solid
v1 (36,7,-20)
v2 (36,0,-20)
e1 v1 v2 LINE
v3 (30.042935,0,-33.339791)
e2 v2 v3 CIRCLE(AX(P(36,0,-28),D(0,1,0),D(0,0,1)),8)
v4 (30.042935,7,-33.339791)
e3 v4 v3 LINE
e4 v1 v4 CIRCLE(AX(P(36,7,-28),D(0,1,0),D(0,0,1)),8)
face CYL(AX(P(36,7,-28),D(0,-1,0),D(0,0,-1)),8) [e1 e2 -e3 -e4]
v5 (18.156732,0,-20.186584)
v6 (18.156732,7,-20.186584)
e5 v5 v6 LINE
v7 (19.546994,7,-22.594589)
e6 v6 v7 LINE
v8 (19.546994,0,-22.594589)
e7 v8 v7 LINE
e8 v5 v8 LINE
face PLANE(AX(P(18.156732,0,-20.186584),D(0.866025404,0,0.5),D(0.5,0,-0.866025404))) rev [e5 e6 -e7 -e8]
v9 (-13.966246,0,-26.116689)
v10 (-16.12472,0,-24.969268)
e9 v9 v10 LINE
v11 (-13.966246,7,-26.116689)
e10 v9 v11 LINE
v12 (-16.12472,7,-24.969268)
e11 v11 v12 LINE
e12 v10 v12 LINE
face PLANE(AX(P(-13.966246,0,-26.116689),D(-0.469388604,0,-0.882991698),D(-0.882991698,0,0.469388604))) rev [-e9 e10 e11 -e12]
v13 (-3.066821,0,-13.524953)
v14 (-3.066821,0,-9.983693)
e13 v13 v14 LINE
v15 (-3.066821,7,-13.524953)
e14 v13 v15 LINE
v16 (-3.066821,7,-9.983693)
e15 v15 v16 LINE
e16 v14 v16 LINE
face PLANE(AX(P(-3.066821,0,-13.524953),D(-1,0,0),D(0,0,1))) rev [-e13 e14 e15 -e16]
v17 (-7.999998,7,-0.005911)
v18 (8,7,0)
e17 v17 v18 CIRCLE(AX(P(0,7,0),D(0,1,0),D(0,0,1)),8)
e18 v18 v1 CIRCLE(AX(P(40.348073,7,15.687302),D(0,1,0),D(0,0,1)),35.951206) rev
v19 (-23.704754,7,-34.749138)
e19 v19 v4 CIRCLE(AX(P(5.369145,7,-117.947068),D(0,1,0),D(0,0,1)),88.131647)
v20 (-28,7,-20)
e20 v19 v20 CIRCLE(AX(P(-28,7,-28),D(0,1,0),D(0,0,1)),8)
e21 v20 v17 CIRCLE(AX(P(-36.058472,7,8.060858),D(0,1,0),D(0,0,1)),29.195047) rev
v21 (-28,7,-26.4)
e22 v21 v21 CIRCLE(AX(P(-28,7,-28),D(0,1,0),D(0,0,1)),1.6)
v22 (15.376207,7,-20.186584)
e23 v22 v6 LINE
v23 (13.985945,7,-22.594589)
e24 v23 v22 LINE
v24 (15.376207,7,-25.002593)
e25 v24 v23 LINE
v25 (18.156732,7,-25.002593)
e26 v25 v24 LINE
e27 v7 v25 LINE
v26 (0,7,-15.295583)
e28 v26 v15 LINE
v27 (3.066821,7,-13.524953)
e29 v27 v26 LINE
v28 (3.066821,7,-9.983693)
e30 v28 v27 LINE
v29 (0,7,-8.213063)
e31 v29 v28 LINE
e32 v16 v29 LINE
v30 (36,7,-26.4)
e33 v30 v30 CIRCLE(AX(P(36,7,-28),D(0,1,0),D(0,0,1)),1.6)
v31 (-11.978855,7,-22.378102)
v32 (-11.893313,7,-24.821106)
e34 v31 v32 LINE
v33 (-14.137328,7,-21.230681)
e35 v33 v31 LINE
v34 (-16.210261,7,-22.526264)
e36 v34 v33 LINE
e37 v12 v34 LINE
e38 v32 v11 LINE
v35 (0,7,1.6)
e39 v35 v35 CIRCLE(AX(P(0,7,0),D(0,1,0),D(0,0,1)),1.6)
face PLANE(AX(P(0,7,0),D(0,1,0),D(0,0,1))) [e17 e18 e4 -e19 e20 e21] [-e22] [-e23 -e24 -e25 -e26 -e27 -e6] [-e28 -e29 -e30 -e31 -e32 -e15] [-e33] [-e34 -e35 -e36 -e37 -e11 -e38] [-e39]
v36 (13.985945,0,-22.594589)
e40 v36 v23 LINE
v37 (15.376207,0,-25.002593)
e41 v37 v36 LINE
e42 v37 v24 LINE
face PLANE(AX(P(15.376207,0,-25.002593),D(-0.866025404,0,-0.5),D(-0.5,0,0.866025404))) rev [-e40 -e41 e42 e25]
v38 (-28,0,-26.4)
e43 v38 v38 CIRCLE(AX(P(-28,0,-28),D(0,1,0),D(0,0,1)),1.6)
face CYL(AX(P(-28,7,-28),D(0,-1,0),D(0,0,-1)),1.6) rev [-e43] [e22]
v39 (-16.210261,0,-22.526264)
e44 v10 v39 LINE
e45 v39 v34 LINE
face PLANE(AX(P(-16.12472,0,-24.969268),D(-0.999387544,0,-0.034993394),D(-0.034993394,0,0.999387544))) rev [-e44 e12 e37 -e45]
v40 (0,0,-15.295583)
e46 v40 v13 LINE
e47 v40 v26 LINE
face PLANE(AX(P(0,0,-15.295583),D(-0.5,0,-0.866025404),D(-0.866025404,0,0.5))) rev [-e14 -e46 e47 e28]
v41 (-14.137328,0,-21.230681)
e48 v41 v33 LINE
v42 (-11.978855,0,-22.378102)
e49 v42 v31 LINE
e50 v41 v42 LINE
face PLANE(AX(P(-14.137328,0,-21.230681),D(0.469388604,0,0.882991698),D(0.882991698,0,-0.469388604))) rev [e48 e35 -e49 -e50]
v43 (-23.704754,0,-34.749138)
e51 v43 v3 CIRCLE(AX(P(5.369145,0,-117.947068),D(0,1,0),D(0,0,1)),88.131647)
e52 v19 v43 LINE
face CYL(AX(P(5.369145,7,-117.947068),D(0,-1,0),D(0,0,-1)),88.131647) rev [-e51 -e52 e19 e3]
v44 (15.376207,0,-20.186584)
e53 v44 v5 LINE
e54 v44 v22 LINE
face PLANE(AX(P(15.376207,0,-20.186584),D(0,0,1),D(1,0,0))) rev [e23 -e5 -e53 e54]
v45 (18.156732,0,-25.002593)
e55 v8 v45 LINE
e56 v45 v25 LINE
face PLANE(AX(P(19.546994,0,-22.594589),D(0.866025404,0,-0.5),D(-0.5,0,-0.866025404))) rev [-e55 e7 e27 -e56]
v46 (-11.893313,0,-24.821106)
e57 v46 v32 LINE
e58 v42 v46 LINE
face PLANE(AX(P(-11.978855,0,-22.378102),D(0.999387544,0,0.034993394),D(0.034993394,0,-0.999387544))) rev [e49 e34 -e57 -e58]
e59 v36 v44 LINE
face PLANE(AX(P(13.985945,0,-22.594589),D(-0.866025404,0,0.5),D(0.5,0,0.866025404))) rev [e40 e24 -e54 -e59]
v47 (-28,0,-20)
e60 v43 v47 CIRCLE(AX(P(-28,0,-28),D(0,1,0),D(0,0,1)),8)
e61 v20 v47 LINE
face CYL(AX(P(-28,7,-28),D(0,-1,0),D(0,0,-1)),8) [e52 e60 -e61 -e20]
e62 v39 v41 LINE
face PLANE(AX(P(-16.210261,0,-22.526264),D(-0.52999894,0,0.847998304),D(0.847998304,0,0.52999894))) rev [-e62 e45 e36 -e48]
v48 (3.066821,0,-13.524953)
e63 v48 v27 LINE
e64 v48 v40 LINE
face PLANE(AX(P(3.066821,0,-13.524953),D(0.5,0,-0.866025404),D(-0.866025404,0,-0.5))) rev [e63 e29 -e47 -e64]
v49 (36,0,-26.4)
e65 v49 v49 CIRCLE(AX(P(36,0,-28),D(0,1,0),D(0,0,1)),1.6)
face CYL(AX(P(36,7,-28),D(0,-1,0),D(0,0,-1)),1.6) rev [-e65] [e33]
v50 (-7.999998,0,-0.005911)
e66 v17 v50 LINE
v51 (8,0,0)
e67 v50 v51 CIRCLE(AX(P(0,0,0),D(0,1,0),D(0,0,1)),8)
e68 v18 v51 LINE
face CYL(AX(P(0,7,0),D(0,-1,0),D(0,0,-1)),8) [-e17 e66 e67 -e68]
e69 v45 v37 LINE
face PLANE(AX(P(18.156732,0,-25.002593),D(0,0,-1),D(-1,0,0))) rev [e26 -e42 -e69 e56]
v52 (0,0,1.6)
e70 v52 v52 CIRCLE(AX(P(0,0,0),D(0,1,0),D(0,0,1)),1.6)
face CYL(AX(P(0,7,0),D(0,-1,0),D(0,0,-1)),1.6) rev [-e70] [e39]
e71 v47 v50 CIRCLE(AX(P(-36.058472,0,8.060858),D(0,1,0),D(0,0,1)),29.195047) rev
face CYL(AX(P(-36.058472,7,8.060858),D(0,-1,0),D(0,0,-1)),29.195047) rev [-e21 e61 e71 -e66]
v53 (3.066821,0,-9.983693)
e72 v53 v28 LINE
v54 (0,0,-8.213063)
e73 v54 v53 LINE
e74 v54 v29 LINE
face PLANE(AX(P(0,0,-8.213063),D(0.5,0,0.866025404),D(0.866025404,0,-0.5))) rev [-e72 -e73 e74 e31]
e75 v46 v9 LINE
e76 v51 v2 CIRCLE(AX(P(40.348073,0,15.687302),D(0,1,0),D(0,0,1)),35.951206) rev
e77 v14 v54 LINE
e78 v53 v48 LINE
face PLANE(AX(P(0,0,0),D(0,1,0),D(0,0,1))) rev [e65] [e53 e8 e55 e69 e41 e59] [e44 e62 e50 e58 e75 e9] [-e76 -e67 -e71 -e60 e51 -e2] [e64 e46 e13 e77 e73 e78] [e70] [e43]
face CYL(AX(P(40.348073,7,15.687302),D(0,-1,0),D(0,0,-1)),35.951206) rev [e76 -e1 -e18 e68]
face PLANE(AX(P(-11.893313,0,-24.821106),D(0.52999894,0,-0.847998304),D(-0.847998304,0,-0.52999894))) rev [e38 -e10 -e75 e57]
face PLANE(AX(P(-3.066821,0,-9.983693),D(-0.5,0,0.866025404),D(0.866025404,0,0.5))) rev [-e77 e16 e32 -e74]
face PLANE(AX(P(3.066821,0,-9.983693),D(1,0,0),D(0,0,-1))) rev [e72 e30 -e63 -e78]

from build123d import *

# Parameters (mm, degrees)
BOSS_EXTRUDE2_OUTLINE_R = 1.6
BOSS_EXTRUDE2_DEPTH     = 7
CUT_EXTRUDE1_DEPTH      = 58.280013967


# Read off the part's stored shape, not the designer's step: Boss-Extrude2
with BuildPart() as part:
    # Boss-Extrude2 outline → Boss-Extrude2 (new body)
    with BuildSketch(Plane(origin=(0, 0, 0), x_dir=(1, 0, 0), z_dir=(0, 1, 0))):
        with BuildLine():
            ThreePointArc((36, 20), (43.304735803, 31.262029255), (30.042934529, 33.339791286))
            ThreePointArc((30.042934529, 33.339791286), (3.05899236, 29.845703842), (-23.704753961, 34.749137831))
            ThreePointArc((-23.704753961, 34.749137831), (-35.680921255, 30.236838992), (-28, 20))
            ThreePointArc((-28, 20), (-15.417509156, 12.586209164), (-7.999997816, 0.005911236))
            ThreePointArc((-7.999997816, 0.005911236), (-0.002955618, -7.999999454), (8, 0))
            ThreePointArc((8, 0), (19.451858394, 13.567398249), (36, 20))
        make_face()
        Circle(BOSS_EXTRUDE2_OUTLINE_R, mode=Mode.SUBTRACT)
        with Locations((-28, 28)):
            Circle(BOSS_EXTRUDE2_OUTLINE_R, mode=Mode.SUBTRACT)
        with Locations((36, 28)):
            Circle(BOSS_EXTRUDE2_OUTLINE_R, mode=Mode.SUBTRACT)
    extrude(amount=BOSS_EXTRUDE2_DEPTH)

    # Sketch5 → Cut-Extrude1 (cut, through all)
    with BuildSketch(Plane(origin=(0, 7, 0), x_dir=(1, 0, 0), z_dir=(0, 1, 0))):
        Polygon((-11.978854601, 22.378102142), (-11.893313223, 24.821105741), (-13.966245712, 26.116688546), (-16.124719579, 24.969267753), (-16.210260957, 22.526264155), (-14.137328468, 21.230681349), align=None)
        Polygon((19.546993666, 22.594588654), (18.156731561, 25.002593256), (15.37620735, 25.002593256), (13.985945245, 22.594588654), (15.37620735, 20.186584052), (18.156731561, 20.186584052), align=None)
        Polygon((0, 8.213063469), (3.066820834, 9.983693303), (3.066820834, 13.524952971), (0, 15.295582806), (-3.066820834, 13.524952971), (-3.066820834, 9.983693303), align=None)
    extrude(amount=-CUT_EXTRUDE1_DEPTH, mode=Mode.SUBTRACT)


solid = part.part
